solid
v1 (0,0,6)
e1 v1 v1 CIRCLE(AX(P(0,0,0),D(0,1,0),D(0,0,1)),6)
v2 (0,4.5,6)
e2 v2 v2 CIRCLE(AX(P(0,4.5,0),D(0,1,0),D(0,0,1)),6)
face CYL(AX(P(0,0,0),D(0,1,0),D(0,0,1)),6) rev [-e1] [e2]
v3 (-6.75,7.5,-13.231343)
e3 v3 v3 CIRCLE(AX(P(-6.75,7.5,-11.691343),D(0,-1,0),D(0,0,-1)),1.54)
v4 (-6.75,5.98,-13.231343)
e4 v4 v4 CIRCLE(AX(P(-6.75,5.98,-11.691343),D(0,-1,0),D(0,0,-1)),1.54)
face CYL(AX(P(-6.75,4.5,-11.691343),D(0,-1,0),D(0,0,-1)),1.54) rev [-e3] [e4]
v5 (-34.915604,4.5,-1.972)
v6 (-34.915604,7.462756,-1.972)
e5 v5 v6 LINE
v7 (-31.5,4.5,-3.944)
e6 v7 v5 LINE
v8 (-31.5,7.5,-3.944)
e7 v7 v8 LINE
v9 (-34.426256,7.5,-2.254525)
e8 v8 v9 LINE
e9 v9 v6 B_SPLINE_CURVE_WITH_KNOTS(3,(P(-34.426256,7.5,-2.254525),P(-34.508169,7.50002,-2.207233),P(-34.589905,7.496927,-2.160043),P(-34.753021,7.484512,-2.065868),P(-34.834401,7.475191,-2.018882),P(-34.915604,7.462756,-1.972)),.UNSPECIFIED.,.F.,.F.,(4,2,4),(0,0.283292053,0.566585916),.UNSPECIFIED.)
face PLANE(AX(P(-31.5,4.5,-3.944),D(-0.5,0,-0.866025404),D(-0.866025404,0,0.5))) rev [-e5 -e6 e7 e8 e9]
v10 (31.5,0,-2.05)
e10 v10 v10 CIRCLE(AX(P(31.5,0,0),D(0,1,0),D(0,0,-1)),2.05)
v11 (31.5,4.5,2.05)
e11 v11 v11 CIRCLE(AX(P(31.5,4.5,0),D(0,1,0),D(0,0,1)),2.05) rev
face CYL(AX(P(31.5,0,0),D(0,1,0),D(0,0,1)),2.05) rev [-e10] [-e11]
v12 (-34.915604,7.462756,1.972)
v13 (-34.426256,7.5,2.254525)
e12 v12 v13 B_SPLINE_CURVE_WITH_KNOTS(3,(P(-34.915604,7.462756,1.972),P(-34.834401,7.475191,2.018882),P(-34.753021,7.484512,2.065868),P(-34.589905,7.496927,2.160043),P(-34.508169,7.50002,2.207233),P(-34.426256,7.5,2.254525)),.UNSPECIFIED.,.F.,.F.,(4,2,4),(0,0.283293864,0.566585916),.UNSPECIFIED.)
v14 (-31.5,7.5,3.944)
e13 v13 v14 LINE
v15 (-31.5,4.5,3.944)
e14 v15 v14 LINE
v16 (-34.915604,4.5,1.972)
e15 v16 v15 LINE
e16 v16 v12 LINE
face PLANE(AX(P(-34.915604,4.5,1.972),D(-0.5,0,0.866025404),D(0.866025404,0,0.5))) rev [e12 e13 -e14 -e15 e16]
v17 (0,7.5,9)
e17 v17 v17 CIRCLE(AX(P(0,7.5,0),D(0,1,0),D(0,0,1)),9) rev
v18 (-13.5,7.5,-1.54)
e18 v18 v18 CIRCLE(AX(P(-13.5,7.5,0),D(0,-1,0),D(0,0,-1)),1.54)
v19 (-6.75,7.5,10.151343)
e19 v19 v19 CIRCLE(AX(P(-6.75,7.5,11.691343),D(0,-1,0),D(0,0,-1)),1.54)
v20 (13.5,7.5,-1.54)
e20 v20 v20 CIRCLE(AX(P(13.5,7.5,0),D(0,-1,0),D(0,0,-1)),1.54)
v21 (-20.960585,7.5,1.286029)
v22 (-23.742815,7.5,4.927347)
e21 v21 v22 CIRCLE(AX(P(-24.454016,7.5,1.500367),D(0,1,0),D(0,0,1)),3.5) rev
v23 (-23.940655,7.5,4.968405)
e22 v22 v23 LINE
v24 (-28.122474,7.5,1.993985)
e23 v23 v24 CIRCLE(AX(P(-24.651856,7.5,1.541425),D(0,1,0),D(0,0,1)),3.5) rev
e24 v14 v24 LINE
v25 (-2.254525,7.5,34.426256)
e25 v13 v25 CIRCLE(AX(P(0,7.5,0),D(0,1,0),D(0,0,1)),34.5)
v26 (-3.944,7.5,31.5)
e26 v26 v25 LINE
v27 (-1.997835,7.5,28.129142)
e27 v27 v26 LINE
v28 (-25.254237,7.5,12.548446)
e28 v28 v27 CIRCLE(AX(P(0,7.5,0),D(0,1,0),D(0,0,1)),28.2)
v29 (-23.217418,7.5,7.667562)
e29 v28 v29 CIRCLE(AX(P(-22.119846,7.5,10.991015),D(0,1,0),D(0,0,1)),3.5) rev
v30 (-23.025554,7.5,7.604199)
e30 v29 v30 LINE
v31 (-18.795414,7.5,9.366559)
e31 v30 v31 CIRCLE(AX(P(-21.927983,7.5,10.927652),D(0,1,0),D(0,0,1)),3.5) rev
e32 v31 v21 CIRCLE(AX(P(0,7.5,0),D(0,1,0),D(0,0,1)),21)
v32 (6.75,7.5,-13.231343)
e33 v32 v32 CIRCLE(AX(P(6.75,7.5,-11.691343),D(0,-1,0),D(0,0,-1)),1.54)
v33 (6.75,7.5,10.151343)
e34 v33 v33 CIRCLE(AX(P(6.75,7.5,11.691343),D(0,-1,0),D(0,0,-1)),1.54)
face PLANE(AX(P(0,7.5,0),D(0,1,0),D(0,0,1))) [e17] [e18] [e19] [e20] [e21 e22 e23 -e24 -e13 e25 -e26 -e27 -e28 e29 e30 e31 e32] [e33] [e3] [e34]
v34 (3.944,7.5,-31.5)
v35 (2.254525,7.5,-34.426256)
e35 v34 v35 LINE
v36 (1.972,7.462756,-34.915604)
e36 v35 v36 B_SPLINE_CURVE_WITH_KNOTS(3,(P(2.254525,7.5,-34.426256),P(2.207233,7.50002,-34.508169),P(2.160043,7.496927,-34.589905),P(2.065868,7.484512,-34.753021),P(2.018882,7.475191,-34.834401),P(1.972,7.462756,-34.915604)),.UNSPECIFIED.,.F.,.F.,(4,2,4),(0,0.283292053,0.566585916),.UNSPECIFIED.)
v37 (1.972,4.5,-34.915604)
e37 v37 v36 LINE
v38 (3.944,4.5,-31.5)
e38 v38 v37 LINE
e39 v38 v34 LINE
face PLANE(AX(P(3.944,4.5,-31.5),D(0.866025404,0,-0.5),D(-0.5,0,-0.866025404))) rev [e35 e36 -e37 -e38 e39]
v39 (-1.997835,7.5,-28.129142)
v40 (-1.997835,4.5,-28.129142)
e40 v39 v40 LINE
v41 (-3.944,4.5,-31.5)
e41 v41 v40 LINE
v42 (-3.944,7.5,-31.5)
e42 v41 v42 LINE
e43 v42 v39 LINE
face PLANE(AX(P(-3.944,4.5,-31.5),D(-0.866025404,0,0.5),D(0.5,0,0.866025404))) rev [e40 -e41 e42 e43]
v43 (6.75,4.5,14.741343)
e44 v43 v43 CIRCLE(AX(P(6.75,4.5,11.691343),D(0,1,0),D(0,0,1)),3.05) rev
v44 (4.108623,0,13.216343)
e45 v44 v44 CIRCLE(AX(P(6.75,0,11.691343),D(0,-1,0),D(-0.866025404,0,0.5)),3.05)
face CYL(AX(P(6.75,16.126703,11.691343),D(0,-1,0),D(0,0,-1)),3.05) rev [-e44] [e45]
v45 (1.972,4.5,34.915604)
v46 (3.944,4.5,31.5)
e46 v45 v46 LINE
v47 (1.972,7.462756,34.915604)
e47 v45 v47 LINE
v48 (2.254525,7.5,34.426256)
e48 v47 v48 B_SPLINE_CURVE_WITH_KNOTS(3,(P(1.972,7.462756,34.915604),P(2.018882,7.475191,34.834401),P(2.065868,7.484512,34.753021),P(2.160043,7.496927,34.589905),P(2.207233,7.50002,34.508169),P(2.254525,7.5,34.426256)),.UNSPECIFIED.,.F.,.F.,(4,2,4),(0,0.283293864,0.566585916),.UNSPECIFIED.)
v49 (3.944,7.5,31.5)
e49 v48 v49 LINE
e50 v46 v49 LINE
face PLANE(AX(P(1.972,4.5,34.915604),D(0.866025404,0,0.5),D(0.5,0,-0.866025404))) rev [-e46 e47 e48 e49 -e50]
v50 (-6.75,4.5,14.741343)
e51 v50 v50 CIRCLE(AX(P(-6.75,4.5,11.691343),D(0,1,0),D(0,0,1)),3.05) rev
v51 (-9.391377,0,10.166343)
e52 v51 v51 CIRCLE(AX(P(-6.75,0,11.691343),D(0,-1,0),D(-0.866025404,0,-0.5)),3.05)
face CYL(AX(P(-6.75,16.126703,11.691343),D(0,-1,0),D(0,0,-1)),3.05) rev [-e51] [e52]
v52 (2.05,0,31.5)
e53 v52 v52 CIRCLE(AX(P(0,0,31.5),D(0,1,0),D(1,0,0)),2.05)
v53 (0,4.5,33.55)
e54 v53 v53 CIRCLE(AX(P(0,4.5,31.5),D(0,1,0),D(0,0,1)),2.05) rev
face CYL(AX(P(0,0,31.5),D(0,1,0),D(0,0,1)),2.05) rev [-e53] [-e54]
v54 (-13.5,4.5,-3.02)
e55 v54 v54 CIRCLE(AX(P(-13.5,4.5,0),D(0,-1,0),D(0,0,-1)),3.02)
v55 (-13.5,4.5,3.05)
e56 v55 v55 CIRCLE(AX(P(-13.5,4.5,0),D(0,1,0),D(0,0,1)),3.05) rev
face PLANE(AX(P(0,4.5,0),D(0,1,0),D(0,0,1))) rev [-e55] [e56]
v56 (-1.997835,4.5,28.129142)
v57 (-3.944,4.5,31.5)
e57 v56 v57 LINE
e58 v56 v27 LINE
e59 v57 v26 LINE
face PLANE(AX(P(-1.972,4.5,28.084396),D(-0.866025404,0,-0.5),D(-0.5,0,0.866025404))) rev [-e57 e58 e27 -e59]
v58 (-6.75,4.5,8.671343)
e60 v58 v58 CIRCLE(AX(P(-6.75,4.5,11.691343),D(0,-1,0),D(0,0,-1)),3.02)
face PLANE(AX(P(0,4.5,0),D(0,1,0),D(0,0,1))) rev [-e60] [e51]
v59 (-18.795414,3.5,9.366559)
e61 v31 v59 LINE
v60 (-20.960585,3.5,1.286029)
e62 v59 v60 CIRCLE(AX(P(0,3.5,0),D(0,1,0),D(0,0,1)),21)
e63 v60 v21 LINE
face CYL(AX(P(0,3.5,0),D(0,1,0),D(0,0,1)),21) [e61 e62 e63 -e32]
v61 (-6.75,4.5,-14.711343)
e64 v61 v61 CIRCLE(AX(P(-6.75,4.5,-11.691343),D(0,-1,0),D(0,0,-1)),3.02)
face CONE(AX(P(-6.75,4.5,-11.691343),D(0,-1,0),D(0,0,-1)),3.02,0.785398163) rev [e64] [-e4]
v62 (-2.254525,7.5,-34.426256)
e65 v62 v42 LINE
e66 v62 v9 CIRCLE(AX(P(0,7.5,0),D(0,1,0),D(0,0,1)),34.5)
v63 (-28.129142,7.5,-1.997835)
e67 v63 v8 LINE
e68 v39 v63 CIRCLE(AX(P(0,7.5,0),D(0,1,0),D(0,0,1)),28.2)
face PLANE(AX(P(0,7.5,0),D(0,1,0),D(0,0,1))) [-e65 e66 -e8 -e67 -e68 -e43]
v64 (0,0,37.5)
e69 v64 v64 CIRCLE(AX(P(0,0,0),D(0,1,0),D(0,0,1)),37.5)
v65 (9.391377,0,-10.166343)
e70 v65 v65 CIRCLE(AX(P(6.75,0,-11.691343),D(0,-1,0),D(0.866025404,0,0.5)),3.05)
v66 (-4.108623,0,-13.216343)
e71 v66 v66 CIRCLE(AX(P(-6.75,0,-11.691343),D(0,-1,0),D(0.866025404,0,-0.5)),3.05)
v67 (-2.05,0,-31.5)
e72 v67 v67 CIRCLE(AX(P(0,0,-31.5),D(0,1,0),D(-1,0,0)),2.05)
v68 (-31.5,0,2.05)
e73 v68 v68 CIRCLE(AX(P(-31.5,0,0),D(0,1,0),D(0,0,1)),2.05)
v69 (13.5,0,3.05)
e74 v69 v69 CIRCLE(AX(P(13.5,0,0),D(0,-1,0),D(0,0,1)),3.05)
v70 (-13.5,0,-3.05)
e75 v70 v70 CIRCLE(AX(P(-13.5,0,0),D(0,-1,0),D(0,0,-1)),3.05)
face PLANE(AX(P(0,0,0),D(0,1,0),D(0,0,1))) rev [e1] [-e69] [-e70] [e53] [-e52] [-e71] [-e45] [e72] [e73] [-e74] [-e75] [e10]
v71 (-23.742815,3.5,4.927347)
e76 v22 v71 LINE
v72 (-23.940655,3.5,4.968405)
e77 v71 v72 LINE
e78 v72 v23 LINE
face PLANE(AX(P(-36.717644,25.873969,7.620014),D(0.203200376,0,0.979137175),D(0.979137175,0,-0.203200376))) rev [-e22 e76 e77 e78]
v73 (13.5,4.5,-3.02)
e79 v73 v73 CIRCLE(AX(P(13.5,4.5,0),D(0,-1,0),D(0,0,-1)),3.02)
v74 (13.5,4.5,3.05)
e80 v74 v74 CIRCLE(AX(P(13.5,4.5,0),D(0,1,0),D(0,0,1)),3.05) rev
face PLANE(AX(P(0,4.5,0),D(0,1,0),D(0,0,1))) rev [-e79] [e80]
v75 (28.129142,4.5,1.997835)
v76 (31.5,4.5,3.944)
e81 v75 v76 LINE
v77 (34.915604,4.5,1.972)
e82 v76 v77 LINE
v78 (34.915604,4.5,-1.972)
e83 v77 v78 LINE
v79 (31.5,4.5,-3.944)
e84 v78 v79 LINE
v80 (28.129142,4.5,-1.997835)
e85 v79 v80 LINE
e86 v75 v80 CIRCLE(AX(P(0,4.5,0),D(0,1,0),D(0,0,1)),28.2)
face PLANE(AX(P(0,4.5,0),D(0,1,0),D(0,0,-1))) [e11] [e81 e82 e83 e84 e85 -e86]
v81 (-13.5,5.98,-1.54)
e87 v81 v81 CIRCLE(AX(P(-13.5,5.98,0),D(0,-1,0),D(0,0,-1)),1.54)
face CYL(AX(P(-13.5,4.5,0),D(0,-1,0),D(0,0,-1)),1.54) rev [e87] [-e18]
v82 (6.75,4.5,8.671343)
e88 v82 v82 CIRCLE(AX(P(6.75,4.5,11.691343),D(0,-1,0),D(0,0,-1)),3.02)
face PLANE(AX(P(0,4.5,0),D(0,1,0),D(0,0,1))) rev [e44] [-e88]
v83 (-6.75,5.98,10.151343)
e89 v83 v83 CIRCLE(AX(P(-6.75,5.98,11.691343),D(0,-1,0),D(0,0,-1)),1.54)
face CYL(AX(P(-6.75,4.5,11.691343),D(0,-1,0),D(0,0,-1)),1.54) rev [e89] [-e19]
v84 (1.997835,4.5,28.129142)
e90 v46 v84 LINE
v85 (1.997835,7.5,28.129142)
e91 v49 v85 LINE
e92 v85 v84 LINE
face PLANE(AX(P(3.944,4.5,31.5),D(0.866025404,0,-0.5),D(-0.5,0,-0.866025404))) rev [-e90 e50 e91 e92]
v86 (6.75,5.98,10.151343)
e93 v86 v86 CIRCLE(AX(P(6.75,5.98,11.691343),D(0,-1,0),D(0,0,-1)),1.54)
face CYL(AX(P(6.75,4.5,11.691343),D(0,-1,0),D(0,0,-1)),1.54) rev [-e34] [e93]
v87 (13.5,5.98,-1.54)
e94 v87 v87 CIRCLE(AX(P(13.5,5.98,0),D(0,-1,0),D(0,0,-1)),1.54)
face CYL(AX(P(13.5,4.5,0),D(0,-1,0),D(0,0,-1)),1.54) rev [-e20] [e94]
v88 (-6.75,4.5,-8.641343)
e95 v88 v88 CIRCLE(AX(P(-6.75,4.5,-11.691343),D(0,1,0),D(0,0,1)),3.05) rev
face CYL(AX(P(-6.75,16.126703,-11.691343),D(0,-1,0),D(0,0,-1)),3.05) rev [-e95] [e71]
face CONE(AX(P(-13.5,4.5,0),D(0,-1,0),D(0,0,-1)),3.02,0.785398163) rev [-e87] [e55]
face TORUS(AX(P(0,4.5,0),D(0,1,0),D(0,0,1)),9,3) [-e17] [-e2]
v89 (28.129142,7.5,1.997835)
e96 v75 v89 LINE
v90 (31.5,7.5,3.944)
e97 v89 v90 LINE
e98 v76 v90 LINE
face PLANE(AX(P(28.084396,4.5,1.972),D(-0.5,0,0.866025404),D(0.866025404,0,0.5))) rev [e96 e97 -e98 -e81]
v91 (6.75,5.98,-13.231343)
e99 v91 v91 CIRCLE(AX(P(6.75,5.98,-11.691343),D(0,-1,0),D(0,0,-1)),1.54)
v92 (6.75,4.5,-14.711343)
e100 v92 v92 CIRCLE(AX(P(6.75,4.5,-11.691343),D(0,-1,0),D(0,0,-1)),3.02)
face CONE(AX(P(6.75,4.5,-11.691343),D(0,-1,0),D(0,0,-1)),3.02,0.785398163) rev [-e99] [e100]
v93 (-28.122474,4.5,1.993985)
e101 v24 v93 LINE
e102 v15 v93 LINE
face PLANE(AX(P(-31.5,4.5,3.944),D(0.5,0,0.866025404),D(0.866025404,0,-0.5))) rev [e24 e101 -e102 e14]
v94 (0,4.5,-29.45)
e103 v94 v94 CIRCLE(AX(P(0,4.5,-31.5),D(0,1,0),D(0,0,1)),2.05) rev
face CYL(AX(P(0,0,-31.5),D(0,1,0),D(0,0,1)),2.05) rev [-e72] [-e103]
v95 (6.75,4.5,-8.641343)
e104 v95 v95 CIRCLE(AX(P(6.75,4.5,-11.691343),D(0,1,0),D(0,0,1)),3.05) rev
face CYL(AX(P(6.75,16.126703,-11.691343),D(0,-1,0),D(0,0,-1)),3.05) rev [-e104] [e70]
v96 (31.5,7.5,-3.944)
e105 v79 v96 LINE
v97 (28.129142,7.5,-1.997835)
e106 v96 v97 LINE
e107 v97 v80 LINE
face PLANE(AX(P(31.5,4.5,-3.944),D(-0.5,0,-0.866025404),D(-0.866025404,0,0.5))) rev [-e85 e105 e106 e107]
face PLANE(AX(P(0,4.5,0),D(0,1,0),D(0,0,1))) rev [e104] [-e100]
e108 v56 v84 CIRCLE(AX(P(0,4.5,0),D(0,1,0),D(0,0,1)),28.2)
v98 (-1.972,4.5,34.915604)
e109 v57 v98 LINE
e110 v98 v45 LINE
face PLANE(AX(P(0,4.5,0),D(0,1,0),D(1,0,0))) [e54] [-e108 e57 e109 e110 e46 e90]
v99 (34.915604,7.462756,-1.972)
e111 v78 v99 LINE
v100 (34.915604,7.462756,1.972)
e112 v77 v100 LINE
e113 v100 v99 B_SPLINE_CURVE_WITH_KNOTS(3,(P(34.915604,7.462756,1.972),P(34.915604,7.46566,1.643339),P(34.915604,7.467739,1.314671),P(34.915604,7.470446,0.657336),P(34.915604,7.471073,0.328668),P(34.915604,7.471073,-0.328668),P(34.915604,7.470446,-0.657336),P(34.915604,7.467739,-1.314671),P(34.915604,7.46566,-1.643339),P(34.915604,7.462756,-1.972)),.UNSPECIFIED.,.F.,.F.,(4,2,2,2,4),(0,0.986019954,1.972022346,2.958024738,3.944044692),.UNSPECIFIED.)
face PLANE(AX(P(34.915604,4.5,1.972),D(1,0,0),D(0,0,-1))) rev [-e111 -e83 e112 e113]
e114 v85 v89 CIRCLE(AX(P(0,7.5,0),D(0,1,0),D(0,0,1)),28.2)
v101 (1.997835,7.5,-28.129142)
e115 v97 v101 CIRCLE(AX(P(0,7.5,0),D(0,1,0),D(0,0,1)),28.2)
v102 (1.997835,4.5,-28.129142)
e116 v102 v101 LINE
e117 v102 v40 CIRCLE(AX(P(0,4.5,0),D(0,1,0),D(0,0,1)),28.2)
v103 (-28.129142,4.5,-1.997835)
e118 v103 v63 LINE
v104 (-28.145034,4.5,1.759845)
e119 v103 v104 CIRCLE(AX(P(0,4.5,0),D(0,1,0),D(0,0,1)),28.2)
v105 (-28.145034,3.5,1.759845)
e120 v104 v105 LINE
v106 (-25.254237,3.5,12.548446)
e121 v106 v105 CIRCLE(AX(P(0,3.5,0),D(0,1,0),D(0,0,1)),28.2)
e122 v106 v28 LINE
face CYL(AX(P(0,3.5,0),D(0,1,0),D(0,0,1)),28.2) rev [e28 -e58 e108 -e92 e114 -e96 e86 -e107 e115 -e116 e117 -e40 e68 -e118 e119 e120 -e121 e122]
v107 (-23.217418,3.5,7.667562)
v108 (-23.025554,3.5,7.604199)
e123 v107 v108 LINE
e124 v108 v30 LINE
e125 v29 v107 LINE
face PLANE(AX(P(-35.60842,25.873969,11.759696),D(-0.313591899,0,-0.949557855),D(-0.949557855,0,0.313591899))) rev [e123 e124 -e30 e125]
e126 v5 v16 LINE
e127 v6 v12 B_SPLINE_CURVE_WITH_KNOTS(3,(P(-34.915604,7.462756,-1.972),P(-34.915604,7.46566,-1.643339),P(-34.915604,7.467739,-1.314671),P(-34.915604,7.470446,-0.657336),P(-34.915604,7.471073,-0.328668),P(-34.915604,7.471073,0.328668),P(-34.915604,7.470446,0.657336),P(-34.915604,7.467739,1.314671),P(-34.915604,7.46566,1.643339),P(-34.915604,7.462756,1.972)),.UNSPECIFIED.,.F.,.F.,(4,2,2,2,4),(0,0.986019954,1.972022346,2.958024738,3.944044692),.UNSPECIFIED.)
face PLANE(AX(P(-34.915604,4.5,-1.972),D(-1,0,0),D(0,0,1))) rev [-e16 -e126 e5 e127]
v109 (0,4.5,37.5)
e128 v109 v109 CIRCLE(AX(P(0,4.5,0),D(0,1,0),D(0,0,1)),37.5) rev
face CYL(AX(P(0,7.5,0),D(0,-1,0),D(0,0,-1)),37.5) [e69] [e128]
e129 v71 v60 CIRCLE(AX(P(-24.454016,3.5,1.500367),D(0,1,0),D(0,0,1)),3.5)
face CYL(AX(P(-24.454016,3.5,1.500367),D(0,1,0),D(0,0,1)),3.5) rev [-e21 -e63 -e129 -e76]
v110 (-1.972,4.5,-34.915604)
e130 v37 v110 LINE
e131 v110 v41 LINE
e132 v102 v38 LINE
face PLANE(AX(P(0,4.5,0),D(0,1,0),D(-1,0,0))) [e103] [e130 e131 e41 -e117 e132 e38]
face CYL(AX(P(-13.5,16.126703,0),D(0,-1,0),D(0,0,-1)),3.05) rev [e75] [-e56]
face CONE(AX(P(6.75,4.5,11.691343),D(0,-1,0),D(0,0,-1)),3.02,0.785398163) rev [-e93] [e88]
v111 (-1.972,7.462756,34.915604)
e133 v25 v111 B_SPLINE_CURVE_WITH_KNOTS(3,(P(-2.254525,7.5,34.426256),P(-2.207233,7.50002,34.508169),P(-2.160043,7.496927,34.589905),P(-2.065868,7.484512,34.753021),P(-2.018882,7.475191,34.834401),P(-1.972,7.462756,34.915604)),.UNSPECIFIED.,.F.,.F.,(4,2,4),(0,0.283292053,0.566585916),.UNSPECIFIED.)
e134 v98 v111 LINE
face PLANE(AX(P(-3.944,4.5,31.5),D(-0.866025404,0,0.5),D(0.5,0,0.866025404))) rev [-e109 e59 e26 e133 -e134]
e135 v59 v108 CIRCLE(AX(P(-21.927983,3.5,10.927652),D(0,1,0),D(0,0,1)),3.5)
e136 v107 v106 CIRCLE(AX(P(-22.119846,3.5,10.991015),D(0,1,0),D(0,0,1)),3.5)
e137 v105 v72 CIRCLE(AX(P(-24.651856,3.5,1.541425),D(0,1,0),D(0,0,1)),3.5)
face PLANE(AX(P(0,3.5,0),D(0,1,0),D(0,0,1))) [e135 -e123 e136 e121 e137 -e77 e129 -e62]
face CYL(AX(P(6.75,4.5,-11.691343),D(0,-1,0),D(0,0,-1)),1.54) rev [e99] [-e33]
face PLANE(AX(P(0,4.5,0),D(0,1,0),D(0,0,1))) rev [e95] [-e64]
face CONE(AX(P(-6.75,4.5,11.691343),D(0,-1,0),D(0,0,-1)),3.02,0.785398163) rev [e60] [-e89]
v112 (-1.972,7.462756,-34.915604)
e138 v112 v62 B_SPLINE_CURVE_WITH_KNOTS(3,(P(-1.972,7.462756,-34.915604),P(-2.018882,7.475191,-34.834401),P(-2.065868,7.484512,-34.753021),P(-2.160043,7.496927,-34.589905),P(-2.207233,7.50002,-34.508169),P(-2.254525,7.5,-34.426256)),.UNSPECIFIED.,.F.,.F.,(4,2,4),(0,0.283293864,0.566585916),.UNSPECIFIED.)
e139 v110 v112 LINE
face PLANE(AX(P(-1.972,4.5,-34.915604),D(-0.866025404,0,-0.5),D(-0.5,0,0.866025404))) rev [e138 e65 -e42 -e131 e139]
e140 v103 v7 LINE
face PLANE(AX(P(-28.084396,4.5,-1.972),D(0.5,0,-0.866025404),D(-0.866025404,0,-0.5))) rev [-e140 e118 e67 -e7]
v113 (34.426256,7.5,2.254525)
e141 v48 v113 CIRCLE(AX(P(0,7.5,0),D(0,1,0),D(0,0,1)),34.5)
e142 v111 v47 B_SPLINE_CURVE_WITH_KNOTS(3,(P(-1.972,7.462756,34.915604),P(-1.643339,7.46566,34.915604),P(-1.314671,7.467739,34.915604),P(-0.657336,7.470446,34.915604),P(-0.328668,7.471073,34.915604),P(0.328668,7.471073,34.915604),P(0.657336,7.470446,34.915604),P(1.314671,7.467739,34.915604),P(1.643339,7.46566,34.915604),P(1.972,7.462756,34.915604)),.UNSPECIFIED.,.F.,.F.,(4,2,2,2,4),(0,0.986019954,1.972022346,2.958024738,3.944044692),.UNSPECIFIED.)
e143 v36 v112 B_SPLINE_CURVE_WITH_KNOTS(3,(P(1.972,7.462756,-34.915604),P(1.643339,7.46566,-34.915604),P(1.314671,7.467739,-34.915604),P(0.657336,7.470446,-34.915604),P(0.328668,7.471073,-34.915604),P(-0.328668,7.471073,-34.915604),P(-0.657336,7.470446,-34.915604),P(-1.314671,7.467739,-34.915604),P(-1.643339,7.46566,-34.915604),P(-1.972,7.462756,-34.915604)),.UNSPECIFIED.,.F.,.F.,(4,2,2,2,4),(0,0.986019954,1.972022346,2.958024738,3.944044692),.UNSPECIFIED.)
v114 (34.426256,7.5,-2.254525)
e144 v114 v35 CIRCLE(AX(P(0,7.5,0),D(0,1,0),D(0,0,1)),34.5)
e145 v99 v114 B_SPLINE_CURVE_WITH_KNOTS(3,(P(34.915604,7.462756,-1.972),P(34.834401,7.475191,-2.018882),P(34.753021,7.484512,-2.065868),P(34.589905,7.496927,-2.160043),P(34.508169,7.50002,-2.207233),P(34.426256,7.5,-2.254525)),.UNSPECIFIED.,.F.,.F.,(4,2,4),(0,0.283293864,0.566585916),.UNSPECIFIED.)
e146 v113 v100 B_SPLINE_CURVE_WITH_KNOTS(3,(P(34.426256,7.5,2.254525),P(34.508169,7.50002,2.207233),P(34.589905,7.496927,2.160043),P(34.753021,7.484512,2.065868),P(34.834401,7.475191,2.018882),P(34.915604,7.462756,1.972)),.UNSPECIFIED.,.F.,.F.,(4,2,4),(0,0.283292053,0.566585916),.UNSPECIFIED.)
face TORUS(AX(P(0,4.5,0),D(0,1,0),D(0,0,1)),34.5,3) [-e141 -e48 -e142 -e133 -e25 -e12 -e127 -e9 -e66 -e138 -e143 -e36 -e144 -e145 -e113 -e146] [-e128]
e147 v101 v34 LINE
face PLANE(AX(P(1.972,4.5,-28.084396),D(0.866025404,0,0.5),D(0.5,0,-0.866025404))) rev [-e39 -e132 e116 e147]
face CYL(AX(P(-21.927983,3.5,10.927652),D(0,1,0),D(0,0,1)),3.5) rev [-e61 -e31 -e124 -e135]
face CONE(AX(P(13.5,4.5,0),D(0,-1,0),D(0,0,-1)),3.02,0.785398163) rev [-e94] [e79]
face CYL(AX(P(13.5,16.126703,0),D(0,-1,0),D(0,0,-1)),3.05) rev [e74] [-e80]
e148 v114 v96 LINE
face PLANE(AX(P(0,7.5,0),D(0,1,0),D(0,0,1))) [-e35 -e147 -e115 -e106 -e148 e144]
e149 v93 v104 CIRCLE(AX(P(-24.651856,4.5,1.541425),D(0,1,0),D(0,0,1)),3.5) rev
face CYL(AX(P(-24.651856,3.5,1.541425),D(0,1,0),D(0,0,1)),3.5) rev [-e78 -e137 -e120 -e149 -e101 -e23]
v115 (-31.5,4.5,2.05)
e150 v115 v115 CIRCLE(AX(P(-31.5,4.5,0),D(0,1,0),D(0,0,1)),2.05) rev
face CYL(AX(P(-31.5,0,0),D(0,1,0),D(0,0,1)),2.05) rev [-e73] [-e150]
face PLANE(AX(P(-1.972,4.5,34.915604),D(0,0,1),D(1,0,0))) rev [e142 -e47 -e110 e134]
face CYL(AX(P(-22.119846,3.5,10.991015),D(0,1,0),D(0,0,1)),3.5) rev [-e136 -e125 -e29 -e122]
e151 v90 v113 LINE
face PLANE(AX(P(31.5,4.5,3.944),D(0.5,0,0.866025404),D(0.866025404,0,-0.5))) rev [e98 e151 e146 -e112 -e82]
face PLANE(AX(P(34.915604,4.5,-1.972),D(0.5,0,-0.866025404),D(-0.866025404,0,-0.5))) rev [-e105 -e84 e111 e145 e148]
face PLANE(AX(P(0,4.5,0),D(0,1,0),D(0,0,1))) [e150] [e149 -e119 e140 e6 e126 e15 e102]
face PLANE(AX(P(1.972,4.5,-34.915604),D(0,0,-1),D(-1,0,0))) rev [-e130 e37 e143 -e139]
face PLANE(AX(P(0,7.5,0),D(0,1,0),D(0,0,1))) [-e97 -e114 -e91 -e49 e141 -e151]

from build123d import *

# Parameters (mm, degrees)
SKETCH_1_R               = 37.5
EXTRUDE_1_DEPTH          = 7.5
SKETCH_2_R               = 2.05
CUT_EXTRUDE_1_DEPTH      = 54.560713214
CUT_EXTRUDE_2_DEPTH      = 3
PATTERN_CIRCULAR_1_COUNT = 4
SKETCH_4_R               = 3.05
CUT_EXTRUDE_3_DEPTH      = 4.5
PATTERN_CIRCULAR_2_COUNT = 6
SKETCH_7_R               = 28.2
SKETCH_7_R_2             = 21
CUT_EXTRUDE_4_DEPTH      = 4
SKETCH_9_R               = 6
CUT_EXTRUDE_5_DEPTH      = 54.560713214
EXTRUDE_3_DEPTH          = 4
FILLET_1_R               = 3
FILLET_3_R               = 3
FILLET_5_R               = 3.5
FILLET_6_R               = 3.5


with BuildPart() as part:
    # 草图1 → 凸台-拉伸1 (new body)
    with BuildSketch(Plane(origin=(0, 0, 0), x_dir=(1, 0, 0), z_dir=(0, 1, 0))):
        with Locations(Location((0, 0, 0), (0, 0, 270))):
            Circle(SKETCH_1_R)
    extrude(amount=EXTRUDE_1_DEPTH)

    # 草图2 → 切除-拉伸1 (cut, through all)
    with BuildSketch(Plane(origin=(0, 7.5, 0), x_dir=(1, 0, 0), z_dir=(0, 1, 0))):
        with Locations(Location((-31.5, 0, 0), (0, 0, 270))):
            Circle(SKETCH_2_R)
    cut_extrude_1 = extrude(amount=-CUT_EXTRUDE_1_DEPTH, mode=Mode.SUBTRACT)

    # 草图3 → 切除-拉伸2 (cut)
    with BuildSketch(Plane(origin=(0, 7.5, 0), x_dir=(1, 0, 0), z_dir=(0, 1, 0))):
        Polygon((-31.5, 3.944), (-34.915604193, 1.972), (-34.915604193, -1.972), (-31.5, -3.944), (-28.084395807, -1.972), (-28.084395807, 1.972), align=None)
    cut_extrude_2 = extrude(amount=-CUT_EXTRUDE_2_DEPTH, mode=Mode.SUBTRACT)

    # 阵列(圆周)1: 切除-拉伸1, 切除-拉伸2 ×4 about axis
    pattern_circular_1_axis = Axis((0, 0, 0), (0, 1, 0))
    add([cut_extrude_1.rotate(pattern_circular_1_axis, i * 360 / PATTERN_CIRCULAR_1_COUNT) for i in range(1, PATTERN_CIRCULAR_1_COUNT)], mode=Mode.SUBTRACT)
    add([cut_extrude_2.rotate(pattern_circular_1_axis, i * 360 / PATTERN_CIRCULAR_1_COUNT) for i in range(1, PATTERN_CIRCULAR_1_COUNT)], mode=Mode.SUBTRACT)

    # 草图4 → 切除-拉伸3 (cut)
    with BuildSketch(Plane.XZ):
        with Locations(Location((-13.5, 0, 0), (0, 0, 270))):
            Circle(SKETCH_4_R)
    cut_extrude_3 = extrude(amount=-CUT_EXTRUDE_3_DEPTH, mode=Mode.SUBTRACT)

    # 草图6 → CSK for M3 Countersunk Flat Head Screw1 (revolve, cut)
    with BuildSketch(Plane(origin=(-13.5, 4.5, 0), x_dir=(0, 0, -1), z_dir=(1, 0, 0))):
        Polygon((0, 0), (0, 3), (1.54, 3), (1.54, 1.48), (3.02, 0), align=None)
    csk_for_m3_countersunk_flat_head_screw1 = revolve(axis=Axis((-13.5, -1.85, 0), (0, 1, 0)), mode=Mode.SUBTRACT)

    # 阵列(圆周)2: 切除-拉伸3, CSK for M3 Countersunk Flat Head Screw1 ×6 about axis
    pattern_circular_2_axis = Axis((0, 0, 0), (0, 1, 0))
    add([cut_extrude_3.rotate(pattern_circular_2_axis, i * 360 / PATTERN_CIRCULAR_2_COUNT) for i in range(1, PATTERN_CIRCULAR_2_COUNT)], mode=Mode.SUBTRACT)
    add([csk_for_m3_countersunk_flat_head_screw1.rotate(pattern_circular_2_axis, i * 360 / PATTERN_CIRCULAR_2_COUNT) for i in range(1, PATTERN_CIRCULAR_2_COUNT)], mode=Mode.SUBTRACT)

    # 草图7 → 切除-拉伸4 (cut)
    with BuildSketch(Plane(origin=(0, 7.5, 0), x_dir=(1, 0, 0), z_dir=(0, 1, 0))):
        with Locations(Location((0, 0, 0), (0, 0, 270))):
            Circle(SKETCH_7_R)
        with Locations(Location((0, 0, 0), (0, 0, 270))):
            Circle(SKETCH_7_R_2, mode=Mode.SUBTRACT)
    extrude(amount=-CUT_EXTRUDE_4_DEPTH, mode=Mode.SUBTRACT)

    # 草图9 → 切除-拉伸5 (cut, through all)
    with BuildSketch(Plane(origin=(0, 7.5, 0), x_dir=(1, 0, 0), z_dir=(0, 1, 0))):
        with Locations(Location((0, 0, 0), (0, 0, 270))):
            Circle(SKETCH_9_R)
    extrude(amount=-CUT_EXTRUDE_5_DEPTH, mode=Mode.SUBTRACT)

    # 草图11 → 凸台-拉伸3 (add)
    with BuildSketch(Plane(origin=(0, 3.5, 0), x_dir=(1, 0, 0), z_dir=(0, 1, 0))):
        Polygon((-35.608419575, -11.759696227), (-36.717644054, -7.620014114), (-20.56188067, -4.267207904), (-19.940714962, -6.585429887), align=None)
    extrude(amount=EXTRUDE_3_DEPTH)

    # 圆角1
    # the kernel refuses this fillet: 3 mm, written as the material it takes off along each edge
    with BuildSketch(Plane(origin=(0, 7.5, 0), x_dir=(-0.9495578553408984, 0, 0.31359189938579934), z_dir=(-0.31359189938579934, 0, -0.9495578553408984))) as fillet_1_piece_1:
        with BuildLine():
            CenterArc((37.5 - FILLET_1_R, -FILLET_1_R), FILLET_1_R, 0, 90)
            Line((37.5 - FILLET_1_R, 0), (37.5, 0))
            Line((37.5, 0), (37.5, -FILLET_1_R))
        make_face()
    revolve(axis=Axis((0, 7.5, 0), (0, 1, 0)), revolution_arc=71.72417104, mode=Mode.SUBTRACT)
    with BuildSketch(Plane(origin=(0, 7.5, 0), x_dir=(-0.9791371747811866, 0, 0.20320037638133454), z_dir=(-0.20320037638133454, 0, -0.9791371747811866))) as fillet_1_piece_2:
        with BuildLine():
            CenterArc((37.5 - FILLET_1_R, -FILLET_1_R), FILLET_1_R, 0, 90)
            Line((37.5 - FILLET_1_R, 0), (37.5, 0))
            Line((37.5, 0), (37.5, -FILLET_1_R))
        make_face()
    revolve(axis=Axis((0, 7.5, 0), (0, 1, 0)), revolution_arc=6.55165792, mode=Mode.SUBTRACT)
    with BuildSketch(Plane(origin=(0, 7.5, 0), x_dir=(0, 0, 1), z_dir=(-1, 0, 0))) as fillet_1_piece_3:
        with BuildLine():
            CenterArc((37.5 - FILLET_1_R, -FILLET_1_R), FILLET_1_R, 0, 90)
            Line((37.5 - FILLET_1_R, 0), (37.5, 0))
            Line((37.5, 0), (37.5, -FILLET_1_R))
        make_face()
    revolve(axis=Axis((0, 7.5, 0), (0, 1, 0)), revolution_arc=281.72417104, mode=Mode.SUBTRACT)

    # 圆角3
    fillet_3_edges = [part.edges().sort_by_distance(p)[0] for p in [
        (0, 7.5, -6),
    ]]
    fillet(fillet_3_edges, radius=FILLET_3_R)

    # 圆角5
    fillet_5_edges = [part.edges().sort_by_distance(p)[0] for p in [
        (-26.777531521, 5.5, 8.843291563),
        (-27.611668329, 5.5, 5.730250614),
    ]]
    fillet(fillet_5_edges, radius=FILLET_5_R)

    # 圆角6
    fillet_6_edges = [part.edges().sort_by_distance(p)[0] for p in [
        (-20.56188067, 5.5, 4.267207904),
        (-19.940714962, 5.5, 6.585429887),
    ]]
    fillet(fillet_6_edges, radius=FILLET_6_R)


solid = part.part
